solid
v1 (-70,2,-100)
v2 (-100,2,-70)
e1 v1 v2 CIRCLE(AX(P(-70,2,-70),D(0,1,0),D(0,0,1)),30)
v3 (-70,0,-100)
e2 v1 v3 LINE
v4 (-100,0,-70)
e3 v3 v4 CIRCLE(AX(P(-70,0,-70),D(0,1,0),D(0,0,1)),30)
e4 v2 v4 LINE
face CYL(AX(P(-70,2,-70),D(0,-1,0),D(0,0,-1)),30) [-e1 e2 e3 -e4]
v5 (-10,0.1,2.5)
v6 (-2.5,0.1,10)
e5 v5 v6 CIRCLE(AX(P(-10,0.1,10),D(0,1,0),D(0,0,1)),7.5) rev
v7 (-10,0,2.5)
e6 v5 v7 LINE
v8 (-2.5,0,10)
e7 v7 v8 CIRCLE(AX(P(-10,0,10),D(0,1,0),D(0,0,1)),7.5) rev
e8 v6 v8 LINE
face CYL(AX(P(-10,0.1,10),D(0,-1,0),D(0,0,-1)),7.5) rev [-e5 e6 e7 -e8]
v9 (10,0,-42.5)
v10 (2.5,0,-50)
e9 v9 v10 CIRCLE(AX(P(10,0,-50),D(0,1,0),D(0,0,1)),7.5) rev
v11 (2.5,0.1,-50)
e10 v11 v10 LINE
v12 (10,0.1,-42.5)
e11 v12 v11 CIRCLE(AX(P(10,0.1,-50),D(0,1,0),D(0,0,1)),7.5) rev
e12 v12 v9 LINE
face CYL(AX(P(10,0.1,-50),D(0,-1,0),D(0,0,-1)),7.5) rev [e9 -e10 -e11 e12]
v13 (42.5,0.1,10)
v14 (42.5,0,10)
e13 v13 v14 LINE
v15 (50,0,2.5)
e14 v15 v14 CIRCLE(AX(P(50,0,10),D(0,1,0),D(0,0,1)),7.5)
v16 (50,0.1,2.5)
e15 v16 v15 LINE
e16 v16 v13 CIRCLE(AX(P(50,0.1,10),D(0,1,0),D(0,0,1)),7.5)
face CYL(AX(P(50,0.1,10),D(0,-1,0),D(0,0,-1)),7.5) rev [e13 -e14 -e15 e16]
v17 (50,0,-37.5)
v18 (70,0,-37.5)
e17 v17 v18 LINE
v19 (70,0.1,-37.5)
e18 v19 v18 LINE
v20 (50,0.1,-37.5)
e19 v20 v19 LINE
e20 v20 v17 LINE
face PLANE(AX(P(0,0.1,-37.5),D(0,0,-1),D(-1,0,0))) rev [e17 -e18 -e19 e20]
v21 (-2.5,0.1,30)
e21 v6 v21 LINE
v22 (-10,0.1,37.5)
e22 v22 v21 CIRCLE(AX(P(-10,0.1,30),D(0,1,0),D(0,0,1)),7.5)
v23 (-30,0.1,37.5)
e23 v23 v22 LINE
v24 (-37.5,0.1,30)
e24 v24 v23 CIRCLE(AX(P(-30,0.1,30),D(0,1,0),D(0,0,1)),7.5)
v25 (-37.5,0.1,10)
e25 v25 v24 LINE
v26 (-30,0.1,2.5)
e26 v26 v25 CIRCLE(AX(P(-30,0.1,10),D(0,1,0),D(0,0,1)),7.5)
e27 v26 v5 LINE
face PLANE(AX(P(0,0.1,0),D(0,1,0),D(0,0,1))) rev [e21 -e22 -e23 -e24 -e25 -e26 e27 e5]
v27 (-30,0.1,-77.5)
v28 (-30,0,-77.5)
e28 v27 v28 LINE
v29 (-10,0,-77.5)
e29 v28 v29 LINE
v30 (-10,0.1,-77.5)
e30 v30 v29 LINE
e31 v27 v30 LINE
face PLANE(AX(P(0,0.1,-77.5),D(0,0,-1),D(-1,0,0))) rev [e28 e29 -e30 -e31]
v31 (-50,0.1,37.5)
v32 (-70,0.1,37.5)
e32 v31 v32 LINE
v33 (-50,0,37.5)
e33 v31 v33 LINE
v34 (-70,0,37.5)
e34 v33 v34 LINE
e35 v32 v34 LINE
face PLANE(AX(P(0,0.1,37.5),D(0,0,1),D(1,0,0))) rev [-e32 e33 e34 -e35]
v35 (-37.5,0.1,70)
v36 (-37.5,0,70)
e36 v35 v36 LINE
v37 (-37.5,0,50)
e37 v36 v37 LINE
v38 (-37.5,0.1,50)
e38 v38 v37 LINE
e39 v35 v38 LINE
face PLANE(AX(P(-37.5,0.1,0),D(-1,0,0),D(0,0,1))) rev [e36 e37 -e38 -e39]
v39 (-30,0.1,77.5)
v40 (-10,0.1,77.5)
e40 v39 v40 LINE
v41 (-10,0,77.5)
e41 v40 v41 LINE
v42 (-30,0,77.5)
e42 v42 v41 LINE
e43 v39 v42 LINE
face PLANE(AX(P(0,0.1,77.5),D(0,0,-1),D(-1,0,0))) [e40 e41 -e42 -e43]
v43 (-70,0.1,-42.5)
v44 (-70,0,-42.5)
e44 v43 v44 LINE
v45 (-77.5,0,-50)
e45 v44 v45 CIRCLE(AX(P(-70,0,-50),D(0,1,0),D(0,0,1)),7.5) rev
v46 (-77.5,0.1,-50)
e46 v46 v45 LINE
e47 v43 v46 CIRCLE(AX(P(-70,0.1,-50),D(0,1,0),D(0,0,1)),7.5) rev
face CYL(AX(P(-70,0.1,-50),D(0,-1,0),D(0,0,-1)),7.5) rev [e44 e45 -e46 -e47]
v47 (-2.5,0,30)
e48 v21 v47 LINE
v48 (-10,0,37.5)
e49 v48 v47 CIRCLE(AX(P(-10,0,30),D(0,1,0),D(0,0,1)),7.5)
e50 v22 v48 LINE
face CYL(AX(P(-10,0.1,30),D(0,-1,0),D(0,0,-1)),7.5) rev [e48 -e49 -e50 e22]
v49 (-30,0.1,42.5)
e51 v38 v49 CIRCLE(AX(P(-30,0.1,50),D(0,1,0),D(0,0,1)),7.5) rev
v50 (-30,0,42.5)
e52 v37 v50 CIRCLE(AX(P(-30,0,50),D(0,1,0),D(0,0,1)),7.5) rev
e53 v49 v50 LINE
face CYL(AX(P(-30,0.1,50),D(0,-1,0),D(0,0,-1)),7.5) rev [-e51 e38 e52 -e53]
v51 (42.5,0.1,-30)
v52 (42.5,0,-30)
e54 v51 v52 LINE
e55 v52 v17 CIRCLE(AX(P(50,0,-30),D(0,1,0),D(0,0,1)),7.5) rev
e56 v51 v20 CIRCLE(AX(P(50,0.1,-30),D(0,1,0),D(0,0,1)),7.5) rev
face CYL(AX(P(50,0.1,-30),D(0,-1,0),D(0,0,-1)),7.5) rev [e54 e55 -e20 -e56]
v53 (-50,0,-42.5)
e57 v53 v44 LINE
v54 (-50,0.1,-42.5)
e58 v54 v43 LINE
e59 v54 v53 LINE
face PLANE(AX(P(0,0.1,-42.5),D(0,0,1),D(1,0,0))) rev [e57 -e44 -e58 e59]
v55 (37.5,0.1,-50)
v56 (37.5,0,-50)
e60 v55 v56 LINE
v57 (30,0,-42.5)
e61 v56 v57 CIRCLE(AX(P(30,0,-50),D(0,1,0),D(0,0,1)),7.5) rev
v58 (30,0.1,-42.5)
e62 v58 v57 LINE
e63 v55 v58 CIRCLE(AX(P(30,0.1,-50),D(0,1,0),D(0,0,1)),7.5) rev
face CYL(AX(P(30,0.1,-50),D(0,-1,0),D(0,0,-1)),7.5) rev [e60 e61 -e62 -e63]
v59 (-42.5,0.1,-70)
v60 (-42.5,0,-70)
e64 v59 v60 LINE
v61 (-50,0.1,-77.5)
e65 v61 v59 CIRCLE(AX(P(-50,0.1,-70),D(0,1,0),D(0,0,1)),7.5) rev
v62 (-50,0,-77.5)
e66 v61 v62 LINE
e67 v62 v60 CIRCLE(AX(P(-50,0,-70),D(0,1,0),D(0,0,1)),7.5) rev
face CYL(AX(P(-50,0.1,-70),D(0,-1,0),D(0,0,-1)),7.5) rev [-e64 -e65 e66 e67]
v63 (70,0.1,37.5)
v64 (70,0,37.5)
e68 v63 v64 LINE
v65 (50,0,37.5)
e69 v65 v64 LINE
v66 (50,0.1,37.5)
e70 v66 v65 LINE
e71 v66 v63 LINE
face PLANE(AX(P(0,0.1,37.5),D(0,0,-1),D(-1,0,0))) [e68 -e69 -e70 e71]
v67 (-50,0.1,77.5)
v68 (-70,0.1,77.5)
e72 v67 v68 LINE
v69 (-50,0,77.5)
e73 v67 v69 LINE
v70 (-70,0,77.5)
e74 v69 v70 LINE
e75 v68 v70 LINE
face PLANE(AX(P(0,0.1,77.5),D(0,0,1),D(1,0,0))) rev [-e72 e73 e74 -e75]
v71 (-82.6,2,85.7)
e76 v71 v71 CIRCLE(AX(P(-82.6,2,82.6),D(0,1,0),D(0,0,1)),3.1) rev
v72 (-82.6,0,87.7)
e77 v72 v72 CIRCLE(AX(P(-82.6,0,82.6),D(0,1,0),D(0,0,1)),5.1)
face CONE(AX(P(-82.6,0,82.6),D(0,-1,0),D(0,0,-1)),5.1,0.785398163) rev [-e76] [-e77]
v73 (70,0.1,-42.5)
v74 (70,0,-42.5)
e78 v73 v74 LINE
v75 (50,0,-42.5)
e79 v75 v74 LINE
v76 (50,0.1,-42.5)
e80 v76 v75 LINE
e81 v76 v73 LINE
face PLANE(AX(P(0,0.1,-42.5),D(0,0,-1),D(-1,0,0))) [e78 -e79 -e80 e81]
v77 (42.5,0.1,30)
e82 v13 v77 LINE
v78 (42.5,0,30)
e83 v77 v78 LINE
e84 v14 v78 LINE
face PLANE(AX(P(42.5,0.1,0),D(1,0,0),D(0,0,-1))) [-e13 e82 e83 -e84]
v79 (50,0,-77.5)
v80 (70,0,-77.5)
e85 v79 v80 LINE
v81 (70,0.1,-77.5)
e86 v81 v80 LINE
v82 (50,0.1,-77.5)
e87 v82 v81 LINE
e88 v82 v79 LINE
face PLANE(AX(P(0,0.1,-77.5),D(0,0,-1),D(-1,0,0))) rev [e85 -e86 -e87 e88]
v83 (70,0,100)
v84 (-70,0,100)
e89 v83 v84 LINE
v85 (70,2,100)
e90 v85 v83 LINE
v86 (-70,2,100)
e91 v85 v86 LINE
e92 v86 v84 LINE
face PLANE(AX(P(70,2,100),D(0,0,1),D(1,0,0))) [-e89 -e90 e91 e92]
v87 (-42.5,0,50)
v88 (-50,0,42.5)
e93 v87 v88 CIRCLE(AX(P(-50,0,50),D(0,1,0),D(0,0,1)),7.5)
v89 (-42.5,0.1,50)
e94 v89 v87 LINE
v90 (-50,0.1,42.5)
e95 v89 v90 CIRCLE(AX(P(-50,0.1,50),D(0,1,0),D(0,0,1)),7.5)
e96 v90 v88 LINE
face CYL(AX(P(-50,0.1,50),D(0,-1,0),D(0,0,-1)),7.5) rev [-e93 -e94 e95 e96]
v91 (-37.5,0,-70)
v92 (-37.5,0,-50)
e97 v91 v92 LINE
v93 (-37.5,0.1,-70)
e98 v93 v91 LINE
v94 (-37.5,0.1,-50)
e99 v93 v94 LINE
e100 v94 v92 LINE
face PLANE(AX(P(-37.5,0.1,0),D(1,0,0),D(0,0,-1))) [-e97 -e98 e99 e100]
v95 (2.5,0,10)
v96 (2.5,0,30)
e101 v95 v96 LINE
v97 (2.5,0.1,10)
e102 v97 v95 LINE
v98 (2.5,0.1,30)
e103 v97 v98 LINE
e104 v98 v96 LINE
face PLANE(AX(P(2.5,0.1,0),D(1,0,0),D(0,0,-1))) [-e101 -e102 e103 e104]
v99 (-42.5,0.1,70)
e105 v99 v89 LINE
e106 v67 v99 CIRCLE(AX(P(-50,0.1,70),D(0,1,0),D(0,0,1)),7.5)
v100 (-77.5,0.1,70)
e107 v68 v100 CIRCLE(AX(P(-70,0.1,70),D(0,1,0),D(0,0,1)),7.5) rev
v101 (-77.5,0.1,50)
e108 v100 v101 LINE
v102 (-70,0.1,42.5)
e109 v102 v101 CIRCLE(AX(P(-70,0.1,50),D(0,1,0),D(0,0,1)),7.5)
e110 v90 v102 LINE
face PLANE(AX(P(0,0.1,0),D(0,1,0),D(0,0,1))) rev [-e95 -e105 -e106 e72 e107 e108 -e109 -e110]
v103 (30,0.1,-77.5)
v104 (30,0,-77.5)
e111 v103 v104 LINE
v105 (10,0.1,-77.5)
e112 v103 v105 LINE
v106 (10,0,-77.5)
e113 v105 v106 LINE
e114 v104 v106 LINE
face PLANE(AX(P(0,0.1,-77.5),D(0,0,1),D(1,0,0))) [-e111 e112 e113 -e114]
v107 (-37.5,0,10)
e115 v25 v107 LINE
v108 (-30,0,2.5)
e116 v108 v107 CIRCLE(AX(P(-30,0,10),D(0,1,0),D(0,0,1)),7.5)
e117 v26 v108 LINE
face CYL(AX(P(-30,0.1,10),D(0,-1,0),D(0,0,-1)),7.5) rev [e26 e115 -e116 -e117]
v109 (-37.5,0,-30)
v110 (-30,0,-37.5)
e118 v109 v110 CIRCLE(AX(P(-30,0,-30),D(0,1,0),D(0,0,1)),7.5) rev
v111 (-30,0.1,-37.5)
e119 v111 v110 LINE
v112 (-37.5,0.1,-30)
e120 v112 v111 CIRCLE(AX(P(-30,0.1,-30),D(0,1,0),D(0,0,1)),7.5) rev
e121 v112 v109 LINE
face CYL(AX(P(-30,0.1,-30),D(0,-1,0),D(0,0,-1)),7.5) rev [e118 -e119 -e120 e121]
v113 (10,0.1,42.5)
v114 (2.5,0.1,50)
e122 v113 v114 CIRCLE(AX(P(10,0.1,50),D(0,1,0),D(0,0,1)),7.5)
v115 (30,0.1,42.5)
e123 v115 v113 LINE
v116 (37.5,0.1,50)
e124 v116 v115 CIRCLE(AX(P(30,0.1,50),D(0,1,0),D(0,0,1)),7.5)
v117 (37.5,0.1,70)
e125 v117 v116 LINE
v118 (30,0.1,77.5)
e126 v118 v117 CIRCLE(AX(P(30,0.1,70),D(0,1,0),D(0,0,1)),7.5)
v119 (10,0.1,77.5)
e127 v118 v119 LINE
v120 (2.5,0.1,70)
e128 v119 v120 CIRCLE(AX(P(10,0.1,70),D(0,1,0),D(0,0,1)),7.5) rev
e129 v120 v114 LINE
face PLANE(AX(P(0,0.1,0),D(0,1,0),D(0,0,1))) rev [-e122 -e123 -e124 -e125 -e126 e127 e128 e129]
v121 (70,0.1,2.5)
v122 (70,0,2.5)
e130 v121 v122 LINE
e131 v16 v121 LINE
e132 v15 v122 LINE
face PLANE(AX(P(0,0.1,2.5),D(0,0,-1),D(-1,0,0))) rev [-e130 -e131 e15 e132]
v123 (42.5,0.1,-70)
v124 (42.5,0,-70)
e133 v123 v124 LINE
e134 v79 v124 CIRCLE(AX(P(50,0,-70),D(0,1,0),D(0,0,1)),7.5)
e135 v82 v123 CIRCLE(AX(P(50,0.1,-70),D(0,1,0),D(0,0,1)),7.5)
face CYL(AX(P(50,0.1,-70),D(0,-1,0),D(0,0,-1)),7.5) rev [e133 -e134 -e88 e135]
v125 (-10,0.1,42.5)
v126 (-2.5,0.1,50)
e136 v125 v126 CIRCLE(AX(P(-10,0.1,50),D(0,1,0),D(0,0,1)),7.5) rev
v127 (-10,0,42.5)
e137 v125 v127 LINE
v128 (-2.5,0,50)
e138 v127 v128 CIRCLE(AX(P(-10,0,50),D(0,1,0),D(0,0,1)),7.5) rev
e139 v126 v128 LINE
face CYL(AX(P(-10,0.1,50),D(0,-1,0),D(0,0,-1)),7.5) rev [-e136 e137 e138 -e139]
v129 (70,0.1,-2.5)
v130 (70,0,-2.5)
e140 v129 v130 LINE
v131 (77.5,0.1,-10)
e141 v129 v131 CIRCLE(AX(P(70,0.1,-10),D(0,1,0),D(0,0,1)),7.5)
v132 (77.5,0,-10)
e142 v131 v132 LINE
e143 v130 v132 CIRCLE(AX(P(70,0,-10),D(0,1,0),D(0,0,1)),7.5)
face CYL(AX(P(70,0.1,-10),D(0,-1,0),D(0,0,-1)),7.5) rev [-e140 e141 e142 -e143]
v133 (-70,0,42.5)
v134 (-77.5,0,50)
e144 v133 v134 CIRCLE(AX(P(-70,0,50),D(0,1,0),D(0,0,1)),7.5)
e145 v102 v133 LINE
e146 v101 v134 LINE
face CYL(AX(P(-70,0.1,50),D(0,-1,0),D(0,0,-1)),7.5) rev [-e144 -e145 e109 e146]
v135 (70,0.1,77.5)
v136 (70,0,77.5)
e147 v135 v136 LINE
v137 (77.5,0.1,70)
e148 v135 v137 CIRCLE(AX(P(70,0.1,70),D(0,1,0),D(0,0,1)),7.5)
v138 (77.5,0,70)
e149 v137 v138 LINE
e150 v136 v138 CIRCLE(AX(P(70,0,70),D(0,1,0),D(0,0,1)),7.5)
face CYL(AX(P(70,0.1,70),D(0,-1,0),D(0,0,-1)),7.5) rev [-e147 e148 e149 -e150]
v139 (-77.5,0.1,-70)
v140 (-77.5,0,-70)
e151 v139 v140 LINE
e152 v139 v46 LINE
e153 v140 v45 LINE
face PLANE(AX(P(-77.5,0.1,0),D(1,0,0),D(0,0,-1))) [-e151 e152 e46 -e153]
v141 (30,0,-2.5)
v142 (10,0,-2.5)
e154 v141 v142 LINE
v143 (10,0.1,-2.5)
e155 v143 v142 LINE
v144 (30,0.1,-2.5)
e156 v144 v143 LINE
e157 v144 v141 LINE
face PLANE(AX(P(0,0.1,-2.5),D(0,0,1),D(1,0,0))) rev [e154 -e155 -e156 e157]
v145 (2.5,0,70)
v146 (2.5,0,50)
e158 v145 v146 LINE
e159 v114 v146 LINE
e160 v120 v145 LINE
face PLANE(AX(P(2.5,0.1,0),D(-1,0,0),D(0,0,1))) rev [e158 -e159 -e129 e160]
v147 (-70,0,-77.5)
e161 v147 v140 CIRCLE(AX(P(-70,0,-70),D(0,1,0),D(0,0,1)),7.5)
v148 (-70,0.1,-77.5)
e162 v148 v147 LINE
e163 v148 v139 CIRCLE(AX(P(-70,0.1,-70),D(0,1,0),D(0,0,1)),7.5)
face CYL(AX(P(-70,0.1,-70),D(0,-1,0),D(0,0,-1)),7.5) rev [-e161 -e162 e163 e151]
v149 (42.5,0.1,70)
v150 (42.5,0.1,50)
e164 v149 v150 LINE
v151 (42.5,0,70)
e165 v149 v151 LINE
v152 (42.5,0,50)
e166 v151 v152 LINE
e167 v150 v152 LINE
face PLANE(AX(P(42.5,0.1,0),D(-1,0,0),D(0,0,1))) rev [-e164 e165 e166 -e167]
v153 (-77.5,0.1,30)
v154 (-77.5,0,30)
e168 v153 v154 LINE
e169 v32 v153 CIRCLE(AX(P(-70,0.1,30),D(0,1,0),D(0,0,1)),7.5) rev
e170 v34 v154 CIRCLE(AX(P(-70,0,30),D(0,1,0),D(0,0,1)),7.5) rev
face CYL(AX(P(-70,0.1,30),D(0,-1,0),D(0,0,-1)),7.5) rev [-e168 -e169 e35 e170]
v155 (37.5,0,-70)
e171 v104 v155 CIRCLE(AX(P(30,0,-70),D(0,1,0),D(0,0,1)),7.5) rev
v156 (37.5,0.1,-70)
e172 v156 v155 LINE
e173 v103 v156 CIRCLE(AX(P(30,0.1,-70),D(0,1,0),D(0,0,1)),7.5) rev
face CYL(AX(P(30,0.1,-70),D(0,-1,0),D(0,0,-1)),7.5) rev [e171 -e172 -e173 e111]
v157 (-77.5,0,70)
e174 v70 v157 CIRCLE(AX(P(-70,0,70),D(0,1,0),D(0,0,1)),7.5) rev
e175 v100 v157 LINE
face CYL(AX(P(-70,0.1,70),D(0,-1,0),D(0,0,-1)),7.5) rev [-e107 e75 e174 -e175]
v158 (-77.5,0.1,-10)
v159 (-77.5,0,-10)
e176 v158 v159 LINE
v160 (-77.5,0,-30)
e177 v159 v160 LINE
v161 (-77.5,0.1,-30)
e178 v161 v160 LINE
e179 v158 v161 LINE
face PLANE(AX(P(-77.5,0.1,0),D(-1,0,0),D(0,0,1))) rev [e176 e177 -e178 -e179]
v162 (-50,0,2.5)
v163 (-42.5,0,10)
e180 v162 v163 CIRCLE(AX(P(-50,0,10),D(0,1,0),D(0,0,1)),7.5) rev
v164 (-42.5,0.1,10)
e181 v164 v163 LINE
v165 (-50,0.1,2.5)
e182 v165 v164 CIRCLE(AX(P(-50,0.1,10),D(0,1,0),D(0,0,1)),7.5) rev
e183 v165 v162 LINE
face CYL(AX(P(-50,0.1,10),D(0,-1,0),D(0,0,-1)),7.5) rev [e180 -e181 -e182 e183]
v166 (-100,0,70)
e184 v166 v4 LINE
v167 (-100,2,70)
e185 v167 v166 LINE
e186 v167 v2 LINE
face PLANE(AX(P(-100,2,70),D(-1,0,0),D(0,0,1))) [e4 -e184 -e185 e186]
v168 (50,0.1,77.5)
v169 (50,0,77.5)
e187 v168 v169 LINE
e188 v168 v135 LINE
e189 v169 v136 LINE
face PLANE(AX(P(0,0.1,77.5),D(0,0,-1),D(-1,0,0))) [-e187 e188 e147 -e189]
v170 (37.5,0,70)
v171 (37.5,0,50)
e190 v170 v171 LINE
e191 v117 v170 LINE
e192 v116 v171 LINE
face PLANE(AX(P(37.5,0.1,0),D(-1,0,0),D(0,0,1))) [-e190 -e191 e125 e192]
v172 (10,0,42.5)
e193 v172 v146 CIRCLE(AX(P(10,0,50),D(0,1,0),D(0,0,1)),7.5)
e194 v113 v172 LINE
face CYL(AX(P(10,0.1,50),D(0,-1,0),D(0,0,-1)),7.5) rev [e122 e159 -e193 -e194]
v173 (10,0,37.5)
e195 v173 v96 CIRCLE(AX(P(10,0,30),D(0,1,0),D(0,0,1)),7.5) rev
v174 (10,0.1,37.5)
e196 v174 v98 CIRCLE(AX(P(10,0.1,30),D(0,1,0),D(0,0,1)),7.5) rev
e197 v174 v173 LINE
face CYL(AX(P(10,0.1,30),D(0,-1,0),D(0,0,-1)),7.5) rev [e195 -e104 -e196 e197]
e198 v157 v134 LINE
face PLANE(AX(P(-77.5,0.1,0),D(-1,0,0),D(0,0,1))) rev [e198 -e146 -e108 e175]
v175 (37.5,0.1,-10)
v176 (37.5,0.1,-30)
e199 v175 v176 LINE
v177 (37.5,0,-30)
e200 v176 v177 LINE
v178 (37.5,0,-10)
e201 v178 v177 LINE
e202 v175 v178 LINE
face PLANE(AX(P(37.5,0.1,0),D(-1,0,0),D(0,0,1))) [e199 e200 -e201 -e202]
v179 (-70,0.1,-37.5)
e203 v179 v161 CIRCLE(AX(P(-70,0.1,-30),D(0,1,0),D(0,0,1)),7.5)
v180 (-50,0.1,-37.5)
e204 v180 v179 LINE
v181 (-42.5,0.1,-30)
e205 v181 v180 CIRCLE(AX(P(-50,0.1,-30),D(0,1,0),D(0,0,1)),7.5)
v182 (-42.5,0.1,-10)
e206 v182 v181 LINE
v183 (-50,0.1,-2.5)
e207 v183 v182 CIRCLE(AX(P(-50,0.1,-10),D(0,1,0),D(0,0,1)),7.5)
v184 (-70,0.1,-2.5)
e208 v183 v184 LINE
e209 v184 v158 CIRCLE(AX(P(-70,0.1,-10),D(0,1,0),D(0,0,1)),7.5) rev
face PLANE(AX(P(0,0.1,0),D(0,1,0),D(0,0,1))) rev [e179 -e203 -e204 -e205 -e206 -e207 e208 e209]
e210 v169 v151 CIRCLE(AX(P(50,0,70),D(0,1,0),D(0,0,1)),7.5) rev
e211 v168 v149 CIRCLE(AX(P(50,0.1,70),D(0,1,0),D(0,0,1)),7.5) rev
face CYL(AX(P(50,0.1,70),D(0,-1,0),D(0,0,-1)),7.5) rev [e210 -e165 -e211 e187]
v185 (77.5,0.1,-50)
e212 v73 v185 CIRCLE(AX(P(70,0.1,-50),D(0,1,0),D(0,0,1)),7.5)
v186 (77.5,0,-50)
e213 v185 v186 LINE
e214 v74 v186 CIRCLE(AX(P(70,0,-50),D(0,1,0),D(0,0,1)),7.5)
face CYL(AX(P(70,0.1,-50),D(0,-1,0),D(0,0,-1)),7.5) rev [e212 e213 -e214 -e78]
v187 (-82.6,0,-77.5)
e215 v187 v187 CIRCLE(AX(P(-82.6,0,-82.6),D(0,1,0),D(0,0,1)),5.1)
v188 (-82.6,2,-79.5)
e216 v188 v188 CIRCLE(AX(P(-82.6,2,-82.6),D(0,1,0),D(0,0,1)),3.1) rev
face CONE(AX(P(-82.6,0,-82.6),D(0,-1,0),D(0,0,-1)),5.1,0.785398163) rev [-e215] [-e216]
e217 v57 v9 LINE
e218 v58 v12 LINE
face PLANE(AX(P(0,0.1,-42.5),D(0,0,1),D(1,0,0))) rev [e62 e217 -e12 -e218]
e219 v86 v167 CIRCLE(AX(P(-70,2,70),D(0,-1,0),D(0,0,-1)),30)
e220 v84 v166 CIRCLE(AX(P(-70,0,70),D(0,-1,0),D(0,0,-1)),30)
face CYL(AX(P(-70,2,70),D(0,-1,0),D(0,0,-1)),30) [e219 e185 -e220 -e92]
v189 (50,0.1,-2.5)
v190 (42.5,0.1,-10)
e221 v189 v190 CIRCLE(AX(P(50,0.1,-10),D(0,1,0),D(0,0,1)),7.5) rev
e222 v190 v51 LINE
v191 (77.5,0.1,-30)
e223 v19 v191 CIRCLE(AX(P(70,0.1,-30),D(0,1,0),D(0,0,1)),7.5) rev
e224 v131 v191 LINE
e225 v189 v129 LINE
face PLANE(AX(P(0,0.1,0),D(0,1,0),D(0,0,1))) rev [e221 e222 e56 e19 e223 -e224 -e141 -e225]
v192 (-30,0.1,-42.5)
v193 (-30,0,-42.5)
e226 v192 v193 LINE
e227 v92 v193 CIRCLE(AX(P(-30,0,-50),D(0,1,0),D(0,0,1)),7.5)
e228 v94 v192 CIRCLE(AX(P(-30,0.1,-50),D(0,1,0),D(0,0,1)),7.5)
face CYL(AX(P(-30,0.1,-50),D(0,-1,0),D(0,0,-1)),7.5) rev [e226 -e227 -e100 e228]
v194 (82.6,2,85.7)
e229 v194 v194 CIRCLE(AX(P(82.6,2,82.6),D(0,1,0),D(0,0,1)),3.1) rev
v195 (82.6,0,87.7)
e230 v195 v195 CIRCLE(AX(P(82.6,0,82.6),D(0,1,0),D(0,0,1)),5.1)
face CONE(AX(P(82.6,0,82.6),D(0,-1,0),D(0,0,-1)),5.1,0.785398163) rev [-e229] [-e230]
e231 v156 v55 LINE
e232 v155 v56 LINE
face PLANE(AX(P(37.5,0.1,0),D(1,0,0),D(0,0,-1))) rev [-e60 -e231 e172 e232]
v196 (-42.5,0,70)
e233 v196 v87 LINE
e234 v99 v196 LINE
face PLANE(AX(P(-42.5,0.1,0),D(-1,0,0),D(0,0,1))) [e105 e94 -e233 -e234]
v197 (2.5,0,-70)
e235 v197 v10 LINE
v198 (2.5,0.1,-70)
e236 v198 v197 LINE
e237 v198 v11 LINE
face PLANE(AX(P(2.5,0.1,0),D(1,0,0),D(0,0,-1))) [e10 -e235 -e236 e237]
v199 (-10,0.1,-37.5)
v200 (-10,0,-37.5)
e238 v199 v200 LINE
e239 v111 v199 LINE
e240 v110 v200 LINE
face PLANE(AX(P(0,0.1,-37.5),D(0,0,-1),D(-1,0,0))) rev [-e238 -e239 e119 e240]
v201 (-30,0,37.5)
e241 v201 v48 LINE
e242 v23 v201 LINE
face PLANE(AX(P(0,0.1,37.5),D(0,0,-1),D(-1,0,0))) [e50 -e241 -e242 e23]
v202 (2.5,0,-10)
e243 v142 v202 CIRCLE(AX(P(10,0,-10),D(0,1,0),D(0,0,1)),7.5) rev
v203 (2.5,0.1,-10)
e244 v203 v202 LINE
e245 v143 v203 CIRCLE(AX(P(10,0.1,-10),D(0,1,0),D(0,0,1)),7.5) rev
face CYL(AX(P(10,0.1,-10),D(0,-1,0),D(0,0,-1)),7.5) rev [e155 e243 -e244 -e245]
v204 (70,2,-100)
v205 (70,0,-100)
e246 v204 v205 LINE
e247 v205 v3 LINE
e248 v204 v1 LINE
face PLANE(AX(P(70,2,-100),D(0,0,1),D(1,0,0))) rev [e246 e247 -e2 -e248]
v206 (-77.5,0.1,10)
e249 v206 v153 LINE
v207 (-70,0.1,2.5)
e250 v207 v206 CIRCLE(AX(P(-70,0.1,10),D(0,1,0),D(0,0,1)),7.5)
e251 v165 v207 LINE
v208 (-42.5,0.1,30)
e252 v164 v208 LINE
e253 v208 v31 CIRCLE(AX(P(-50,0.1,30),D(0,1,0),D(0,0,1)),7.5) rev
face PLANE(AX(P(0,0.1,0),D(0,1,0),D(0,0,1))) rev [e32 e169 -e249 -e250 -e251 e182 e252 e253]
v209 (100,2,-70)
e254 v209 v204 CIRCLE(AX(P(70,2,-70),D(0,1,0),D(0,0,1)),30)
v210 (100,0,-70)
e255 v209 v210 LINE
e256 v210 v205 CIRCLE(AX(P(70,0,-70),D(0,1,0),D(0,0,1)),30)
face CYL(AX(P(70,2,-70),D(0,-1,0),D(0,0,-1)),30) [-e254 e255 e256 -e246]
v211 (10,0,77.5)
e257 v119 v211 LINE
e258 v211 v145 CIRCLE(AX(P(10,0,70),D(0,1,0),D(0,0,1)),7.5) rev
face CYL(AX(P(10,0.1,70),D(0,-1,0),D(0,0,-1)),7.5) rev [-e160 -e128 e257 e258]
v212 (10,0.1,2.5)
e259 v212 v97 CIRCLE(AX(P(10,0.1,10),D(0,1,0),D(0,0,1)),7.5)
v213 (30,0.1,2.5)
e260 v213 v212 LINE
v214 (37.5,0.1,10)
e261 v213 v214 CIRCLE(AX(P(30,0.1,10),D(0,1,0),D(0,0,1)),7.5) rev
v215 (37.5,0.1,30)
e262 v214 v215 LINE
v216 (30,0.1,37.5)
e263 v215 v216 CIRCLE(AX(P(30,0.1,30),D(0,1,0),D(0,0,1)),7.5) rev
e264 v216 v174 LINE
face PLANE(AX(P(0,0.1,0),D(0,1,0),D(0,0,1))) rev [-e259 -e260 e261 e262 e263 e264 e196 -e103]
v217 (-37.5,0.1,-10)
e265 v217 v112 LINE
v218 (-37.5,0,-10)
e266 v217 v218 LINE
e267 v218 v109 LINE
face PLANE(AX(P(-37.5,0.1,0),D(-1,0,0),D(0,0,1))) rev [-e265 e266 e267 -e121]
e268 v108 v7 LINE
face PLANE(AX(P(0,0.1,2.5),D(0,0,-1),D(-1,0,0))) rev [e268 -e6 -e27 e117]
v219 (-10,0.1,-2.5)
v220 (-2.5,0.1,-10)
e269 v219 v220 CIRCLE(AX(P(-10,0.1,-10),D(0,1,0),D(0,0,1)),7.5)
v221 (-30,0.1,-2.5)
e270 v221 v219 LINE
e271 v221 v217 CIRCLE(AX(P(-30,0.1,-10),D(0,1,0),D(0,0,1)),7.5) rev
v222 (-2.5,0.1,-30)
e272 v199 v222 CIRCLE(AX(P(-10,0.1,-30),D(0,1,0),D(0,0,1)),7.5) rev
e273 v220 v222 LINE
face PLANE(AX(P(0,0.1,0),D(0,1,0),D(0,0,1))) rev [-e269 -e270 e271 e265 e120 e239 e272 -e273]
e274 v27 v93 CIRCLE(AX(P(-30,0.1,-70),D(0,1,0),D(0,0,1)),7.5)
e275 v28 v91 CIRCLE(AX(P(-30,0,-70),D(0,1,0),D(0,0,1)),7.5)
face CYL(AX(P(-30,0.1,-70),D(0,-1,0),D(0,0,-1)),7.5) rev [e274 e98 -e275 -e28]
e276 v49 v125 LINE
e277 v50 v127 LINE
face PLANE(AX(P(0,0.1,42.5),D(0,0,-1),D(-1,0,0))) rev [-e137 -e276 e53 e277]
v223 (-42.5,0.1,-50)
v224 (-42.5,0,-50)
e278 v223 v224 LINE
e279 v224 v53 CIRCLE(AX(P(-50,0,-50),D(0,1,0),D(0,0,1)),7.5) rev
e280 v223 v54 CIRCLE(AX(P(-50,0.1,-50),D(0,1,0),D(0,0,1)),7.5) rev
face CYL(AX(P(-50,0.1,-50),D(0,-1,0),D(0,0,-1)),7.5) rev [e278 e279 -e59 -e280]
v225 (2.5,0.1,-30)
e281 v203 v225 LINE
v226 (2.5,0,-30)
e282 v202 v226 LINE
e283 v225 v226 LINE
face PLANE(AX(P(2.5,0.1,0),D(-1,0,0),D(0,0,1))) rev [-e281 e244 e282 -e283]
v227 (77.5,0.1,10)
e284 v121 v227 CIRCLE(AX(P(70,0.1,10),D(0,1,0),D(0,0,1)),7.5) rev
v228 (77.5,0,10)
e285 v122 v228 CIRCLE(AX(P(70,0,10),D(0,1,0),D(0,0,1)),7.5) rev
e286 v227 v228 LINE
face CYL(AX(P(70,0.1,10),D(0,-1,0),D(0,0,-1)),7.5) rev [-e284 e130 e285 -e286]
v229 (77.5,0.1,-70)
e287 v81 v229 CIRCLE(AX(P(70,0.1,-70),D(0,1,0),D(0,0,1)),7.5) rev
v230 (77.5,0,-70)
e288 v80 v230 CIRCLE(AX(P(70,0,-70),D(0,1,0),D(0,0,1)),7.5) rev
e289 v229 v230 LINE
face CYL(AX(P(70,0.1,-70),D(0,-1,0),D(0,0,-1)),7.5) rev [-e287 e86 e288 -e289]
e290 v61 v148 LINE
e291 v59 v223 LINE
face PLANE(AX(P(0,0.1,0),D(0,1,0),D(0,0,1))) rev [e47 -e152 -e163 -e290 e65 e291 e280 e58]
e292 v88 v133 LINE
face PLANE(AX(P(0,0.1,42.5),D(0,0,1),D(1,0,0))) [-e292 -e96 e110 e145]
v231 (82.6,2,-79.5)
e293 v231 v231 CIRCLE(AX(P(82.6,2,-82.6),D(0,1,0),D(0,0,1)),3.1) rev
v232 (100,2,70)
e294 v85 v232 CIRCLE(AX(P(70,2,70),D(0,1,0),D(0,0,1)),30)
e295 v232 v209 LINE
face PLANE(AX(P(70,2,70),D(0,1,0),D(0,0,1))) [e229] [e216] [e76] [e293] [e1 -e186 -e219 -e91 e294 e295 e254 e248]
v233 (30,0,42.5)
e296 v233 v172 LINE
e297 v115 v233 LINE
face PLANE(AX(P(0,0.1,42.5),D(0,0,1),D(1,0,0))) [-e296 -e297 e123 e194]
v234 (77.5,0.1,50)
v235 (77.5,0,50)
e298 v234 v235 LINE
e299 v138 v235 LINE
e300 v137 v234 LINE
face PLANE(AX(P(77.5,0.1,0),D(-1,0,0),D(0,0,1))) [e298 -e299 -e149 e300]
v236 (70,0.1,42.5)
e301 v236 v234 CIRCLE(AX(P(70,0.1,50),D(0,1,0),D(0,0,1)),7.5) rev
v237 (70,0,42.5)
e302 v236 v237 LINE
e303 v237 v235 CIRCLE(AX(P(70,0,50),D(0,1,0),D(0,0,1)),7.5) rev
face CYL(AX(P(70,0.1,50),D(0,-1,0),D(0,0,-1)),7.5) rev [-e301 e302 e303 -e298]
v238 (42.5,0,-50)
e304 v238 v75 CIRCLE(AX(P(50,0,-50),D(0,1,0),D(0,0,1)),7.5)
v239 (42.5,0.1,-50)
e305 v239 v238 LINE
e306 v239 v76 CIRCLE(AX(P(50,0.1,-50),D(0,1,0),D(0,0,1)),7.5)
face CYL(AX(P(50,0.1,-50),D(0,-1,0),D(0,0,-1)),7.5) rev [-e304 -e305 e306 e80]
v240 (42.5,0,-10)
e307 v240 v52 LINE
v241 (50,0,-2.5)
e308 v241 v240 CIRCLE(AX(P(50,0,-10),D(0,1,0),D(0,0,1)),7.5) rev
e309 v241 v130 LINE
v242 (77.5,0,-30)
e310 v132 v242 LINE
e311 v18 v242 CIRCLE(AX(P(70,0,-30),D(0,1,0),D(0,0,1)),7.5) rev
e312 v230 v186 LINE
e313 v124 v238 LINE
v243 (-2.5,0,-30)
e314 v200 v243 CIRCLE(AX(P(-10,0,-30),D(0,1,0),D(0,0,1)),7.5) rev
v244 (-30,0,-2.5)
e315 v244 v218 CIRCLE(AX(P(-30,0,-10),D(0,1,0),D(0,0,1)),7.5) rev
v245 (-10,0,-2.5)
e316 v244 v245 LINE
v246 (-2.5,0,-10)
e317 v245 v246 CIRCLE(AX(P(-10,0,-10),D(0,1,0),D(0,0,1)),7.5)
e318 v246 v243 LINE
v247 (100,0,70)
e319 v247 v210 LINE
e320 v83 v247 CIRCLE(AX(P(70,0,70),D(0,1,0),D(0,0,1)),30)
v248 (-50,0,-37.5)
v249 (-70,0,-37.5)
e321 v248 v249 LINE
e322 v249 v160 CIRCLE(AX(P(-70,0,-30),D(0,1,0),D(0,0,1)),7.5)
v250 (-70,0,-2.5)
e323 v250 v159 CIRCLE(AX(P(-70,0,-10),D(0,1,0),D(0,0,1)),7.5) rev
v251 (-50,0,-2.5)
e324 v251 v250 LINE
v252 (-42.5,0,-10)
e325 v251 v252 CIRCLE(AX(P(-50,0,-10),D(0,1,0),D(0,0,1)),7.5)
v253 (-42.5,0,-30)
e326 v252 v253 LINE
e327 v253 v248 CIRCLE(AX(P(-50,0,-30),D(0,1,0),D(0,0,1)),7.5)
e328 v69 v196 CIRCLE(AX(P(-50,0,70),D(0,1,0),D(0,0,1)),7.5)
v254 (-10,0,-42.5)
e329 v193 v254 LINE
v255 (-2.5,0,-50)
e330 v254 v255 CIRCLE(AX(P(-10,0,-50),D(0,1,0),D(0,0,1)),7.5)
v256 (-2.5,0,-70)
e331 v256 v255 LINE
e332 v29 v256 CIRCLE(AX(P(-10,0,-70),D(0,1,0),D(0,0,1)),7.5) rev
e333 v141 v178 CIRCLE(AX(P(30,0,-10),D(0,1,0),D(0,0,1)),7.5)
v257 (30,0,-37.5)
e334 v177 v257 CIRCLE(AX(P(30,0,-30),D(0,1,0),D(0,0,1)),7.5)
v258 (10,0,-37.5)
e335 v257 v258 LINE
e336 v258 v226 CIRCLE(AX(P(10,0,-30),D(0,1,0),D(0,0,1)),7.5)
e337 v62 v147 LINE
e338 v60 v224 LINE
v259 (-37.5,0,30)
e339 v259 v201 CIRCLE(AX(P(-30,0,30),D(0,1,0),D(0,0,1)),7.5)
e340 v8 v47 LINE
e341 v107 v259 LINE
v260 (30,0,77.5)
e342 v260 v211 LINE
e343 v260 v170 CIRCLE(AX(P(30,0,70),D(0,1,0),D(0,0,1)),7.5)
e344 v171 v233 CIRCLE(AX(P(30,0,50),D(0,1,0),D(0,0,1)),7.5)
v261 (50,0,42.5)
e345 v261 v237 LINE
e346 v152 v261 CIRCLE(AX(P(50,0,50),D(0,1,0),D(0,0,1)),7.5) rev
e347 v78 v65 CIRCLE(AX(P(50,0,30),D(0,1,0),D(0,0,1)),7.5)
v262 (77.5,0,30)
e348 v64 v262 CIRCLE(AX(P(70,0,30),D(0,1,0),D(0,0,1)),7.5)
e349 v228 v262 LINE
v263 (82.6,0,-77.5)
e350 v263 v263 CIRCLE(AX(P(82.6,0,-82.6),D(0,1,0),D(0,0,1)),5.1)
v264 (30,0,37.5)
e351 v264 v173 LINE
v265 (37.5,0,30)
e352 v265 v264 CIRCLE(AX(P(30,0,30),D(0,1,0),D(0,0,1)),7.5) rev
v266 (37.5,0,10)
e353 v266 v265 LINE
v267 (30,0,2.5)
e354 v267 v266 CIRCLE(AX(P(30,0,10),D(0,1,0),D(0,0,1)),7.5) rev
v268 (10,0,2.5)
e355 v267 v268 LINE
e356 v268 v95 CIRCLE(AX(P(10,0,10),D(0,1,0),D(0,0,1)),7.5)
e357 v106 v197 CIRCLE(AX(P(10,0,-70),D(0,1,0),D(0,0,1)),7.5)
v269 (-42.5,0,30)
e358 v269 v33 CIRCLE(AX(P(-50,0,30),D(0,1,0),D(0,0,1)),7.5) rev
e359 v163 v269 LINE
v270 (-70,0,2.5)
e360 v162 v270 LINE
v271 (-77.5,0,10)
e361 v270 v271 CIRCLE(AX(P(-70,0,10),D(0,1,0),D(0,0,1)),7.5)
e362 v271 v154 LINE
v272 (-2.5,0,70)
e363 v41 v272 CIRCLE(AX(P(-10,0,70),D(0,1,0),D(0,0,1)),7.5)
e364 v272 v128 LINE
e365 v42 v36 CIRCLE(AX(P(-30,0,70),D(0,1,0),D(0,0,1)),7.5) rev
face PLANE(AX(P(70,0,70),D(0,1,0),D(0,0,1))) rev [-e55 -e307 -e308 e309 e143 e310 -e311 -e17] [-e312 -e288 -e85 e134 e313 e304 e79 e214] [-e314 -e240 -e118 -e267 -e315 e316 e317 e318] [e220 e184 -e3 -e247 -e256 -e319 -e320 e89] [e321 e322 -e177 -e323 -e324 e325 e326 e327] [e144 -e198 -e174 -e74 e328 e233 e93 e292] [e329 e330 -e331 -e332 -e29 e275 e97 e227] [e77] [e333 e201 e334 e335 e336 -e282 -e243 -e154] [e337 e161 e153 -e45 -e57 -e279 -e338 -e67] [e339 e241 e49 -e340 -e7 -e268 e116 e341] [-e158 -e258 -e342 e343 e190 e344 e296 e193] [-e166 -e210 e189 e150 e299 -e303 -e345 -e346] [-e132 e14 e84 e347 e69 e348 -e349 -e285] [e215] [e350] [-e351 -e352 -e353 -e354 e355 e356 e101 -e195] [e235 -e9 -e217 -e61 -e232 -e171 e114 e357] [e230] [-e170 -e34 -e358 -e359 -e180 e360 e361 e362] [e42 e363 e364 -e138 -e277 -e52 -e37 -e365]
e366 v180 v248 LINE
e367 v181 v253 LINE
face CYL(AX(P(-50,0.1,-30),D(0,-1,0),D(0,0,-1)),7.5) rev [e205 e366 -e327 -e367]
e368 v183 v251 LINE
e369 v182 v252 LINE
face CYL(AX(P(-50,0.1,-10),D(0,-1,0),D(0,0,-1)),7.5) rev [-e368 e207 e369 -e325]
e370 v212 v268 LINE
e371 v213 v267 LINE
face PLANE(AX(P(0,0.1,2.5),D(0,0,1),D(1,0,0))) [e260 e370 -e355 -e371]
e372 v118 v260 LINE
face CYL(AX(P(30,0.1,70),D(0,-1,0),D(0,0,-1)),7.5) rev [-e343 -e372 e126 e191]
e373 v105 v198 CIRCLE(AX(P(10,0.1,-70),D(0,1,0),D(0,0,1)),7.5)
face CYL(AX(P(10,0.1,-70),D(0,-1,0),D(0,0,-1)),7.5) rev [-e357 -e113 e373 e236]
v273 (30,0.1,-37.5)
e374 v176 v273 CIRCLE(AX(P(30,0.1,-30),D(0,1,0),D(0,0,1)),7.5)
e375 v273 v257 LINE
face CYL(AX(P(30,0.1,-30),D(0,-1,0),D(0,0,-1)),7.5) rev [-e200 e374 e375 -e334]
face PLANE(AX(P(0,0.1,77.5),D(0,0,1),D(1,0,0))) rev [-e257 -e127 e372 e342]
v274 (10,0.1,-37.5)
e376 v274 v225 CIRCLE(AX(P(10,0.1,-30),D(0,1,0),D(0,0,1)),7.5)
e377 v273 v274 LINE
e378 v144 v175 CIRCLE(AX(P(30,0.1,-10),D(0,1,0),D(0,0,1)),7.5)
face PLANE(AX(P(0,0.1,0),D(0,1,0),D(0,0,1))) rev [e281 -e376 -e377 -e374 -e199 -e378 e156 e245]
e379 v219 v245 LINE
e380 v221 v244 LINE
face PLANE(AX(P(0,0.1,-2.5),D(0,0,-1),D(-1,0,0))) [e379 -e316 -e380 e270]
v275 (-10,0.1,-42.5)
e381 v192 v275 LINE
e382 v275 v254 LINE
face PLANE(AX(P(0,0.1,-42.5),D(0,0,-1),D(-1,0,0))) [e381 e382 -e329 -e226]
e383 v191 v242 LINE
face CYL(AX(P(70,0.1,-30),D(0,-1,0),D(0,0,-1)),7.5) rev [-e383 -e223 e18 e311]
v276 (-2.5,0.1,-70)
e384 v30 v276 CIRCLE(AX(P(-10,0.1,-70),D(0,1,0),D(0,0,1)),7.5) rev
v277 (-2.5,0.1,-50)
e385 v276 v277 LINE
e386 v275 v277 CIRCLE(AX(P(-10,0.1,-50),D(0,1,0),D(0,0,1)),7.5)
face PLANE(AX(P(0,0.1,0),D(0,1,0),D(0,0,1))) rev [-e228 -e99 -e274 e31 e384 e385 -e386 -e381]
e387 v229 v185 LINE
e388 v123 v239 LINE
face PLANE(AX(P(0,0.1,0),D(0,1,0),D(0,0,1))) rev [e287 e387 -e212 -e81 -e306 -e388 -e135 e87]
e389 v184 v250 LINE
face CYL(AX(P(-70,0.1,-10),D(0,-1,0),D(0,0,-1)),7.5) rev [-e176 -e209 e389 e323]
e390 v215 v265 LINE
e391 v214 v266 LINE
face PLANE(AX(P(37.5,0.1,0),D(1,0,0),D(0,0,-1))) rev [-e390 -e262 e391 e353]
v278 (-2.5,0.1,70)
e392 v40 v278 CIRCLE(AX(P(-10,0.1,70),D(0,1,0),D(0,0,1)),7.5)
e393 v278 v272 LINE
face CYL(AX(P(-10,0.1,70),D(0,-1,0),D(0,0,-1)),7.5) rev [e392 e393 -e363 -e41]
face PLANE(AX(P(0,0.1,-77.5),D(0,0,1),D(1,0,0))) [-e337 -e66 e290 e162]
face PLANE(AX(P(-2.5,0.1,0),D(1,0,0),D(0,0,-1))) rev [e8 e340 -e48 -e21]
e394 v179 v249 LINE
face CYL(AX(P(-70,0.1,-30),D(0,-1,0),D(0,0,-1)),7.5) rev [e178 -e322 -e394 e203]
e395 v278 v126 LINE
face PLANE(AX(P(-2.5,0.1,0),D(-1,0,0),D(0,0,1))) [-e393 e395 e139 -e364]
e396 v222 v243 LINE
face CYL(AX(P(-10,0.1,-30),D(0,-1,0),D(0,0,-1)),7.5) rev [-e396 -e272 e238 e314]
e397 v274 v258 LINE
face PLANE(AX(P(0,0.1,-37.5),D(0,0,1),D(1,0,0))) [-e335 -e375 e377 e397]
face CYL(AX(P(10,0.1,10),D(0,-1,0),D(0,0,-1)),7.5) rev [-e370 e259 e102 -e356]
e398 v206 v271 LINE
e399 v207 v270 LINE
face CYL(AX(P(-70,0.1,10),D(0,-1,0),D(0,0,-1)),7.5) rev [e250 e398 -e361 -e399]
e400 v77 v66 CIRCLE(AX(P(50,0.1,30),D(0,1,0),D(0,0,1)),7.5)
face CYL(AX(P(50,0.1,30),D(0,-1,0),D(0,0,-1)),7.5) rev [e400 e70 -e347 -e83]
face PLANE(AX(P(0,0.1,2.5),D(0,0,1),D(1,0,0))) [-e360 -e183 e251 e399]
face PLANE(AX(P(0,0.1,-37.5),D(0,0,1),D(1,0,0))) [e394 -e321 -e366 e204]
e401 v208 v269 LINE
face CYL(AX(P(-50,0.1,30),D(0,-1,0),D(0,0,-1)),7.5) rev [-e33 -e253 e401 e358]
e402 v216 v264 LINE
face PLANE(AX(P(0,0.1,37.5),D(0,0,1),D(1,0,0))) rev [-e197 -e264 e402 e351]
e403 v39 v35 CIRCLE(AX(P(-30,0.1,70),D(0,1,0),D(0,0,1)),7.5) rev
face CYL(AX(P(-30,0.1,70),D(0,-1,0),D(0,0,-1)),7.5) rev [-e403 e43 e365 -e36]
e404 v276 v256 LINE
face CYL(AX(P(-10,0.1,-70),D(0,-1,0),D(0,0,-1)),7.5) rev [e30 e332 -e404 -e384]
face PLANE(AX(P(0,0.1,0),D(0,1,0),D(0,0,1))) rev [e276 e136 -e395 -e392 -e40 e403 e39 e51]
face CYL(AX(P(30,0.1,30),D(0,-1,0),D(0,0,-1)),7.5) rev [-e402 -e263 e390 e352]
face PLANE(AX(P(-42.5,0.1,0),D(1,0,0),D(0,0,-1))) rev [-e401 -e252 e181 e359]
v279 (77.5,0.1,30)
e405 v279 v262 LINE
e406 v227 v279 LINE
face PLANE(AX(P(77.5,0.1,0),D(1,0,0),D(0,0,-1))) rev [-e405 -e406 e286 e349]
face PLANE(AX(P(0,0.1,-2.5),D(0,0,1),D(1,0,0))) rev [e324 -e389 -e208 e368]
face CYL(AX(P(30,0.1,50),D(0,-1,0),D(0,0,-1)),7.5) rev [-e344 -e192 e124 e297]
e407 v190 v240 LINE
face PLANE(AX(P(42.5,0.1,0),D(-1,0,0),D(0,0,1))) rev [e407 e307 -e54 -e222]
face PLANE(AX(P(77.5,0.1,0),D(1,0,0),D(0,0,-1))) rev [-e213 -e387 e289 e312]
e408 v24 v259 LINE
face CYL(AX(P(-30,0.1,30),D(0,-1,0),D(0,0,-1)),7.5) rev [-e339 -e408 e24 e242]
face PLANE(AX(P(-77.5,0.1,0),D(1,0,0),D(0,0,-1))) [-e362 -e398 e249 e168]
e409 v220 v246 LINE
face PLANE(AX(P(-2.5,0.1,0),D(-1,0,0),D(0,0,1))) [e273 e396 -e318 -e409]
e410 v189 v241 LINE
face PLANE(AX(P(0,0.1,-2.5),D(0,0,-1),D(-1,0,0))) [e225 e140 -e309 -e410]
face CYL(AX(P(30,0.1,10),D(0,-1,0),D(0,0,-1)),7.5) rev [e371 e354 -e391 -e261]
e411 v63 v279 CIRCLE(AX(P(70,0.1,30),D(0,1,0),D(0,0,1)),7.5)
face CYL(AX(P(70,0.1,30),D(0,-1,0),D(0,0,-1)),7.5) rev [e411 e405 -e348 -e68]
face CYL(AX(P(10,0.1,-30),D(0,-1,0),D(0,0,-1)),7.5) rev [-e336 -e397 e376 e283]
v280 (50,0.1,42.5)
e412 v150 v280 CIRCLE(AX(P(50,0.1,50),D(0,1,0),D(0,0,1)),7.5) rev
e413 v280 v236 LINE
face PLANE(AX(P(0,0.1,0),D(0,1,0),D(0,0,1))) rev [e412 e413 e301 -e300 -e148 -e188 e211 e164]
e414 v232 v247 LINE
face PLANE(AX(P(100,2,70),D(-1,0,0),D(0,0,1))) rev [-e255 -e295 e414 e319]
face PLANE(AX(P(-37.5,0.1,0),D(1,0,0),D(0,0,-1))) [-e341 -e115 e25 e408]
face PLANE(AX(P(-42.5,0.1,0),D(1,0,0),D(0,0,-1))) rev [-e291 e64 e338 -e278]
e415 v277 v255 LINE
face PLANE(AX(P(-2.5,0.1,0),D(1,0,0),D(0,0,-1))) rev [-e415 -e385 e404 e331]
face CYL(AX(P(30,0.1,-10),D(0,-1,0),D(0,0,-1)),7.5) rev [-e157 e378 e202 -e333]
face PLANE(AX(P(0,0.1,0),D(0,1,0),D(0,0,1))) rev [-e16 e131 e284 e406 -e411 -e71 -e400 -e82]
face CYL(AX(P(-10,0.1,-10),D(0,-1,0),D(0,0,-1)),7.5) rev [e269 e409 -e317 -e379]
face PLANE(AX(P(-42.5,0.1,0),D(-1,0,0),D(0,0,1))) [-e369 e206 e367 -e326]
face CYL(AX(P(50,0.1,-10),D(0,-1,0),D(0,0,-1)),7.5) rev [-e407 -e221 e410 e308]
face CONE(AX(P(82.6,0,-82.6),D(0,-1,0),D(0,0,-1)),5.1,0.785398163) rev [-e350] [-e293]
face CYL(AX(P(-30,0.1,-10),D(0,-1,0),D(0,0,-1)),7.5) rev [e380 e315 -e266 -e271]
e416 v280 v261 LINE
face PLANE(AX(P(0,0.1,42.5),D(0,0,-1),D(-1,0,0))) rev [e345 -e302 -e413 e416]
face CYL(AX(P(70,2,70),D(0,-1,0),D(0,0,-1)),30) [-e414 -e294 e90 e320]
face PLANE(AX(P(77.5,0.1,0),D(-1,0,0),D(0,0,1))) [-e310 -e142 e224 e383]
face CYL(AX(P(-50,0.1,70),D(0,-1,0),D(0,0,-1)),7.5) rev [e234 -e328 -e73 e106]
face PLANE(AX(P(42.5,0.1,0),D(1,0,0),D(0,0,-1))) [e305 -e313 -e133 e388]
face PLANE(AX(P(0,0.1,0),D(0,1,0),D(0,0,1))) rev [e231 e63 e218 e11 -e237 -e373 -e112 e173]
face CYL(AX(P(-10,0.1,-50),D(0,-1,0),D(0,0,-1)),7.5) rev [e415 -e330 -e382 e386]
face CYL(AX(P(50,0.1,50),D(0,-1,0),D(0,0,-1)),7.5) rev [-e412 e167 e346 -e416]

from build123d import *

# Parameters (mm, degrees)
SKETCH1_R           = 2.6
BOSS_EXTRUDE1_DEPTH = 2
CUT_EXTRUDE1_DEPTH  = 0.1
CHAMFER1_SIZE       = 2.5


with BuildPart() as part:
    # Sketch1 → Boss-Extrude1 (new body)
    with BuildSketch(Plane(origin=(0, 0, 0), x_dir=(1, 0, 0), z_dir=(0, 1, 0))):
        with BuildLine():
            Line((70, -100), (-70, -100))
            ThreePointArc((-70, -100), (-91.213203436, -91.213203436), (-100, -70))
            Line((-100, -70), (-100, 70))
            ThreePointArc((-100, 70), (-91.213203436, 91.213203436), (-70, 100))
            Line((-70, 100), (70, 100))
            ThreePointArc((70, 100), (91.213203436, 91.213203436), (100, 70))
            Line((100, 70), (100, -70))
            ThreePointArc((100, -70), (91.213203436, -91.213203436), (70, -100))
        make_face()
        with Locations(Location((-82.6, 82.6, 0), (0, 0, 270))):
            Circle(SKETCH1_R, mode=Mode.SUBTRACT)
        with Locations(Location((82.6, 82.6, 0), (0, 0, 270))):
            Circle(SKETCH1_R, mode=Mode.SUBTRACT)
        with Locations(Location((82.6, -82.6, 0), (0, 0, 270))):
            Circle(SKETCH1_R, mode=Mode.SUBTRACT)
        with Locations(Location((-82.6, -82.6, 0), (0, 0, 270))):
            Circle(SKETCH1_R, mode=Mode.SUBTRACT)
    extrude(amount=BOSS_EXTRUDE1_DEPTH)

    # Sketch1<3> → Cut-Extrude1 (cut)
    with BuildSketch(Plane(origin=(0, 0, 0), x_dir=(1, 0, 0), z_dir=(0, 1, 0))):
        with BuildLine():
            Line((-42.5, 50), (-42.5, 70))
            ThreePointArc((-42.5, 70), (-44.696699141, 75.303300859), (-50, 77.5))
            Line((-50, 77.5), (-70, 77.5))
            ThreePointArc((-70, 77.5), (-75.303300859, 75.303300859), (-77.5, 70))
            Line((-77.5, 70), (-77.5, 50))
            ThreePointArc((-77.5, 50), (-75.303300859, 44.696699141), (-70, 42.5))
            Line((-70, 42.5), (-50, 42.5))
            ThreePointArc((-50, 42.5), (-44.696699141, 44.696699141), (-42.5, 50))
        make_face()
        with BuildLine():
            Line((-70, 2.5), (-50, 2.5))
            ThreePointArc((-50, 2.5), (-44.696699141, 4.696699141), (-42.5, 10))
            Line((-42.5, 10), (-42.5, 30))
            ThreePointArc((-42.5, 30), (-44.696699141, 35.303300859), (-50, 37.5))
            Line((-50, 37.5), (-70, 37.5))
            ThreePointArc((-70, 37.5), (-75.303300859, 35.303300859), (-77.5, 30))
            Line((-77.5, 30), (-77.5, 10))
            ThreePointArc((-77.5, 10), (-75.303300859, 4.696699141), (-70, 2.5))
        make_face()
        with BuildLine():
            Line((-10, 77.5), (-30, 77.5))
            ThreePointArc((-30, 77.5), (-35.303300859, 75.303300859), (-37.5, 70))
            Line((-37.5, 70), (-37.5, 50))
            ThreePointArc((-37.5, 50), (-35.303300859, 44.696699141), (-30, 42.5))
            Line((-30, 42.5), (-10, 42.5))
            ThreePointArc((-10, 42.5), (-4.696699141, 44.696699141), (-2.5, 50))
            Line((-2.5, 50), (-2.5, 70))
            ThreePointArc((-2.5, 70), (-4.696699141, 75.303300859), (-10, 77.5))
        make_face()
        with BuildLine():
            Line((-10, 37.5), (-30, 37.5))
            ThreePointArc((-30, 37.5), (-35.303300859, 35.303300859), (-37.5, 30))
            Line((-37.5, 30), (-37.5, 10))
            ThreePointArc((-37.5, 10), (-35.303300859, 4.696699141), (-30, 2.5))
            Line((-30, 2.5), (-10, 2.5))
            ThreePointArc((-10, 2.5), (-4.696699141, 4.696699141), (-2.5, 10))
            Line((-2.5, 10), (-2.5, 30))
            ThreePointArc((-2.5, 30), (-4.696699141, 35.303300859), (-10, 37.5))
        make_face()
        with BuildLine():
            Line((42.5, 30), (42.5, 10))
            ThreePointArc((42.5, 10), (44.696699141, 4.696699141), (50, 2.5))
            Line((50, 2.5), (70, 2.5))
            ThreePointArc((70, 2.5), (75.303300859, 4.696699141), (77.5, 10))
            Line((77.5, 10), (77.5, 30))
            ThreePointArc((77.5, 30), (75.303300859, 35.303300859), (70, 37.5))
            Line((70, 37.5), (50, 37.5))
            ThreePointArc((50, 37.5), (44.696699141, 35.303300859), (42.5, 30))
        make_face()
        with BuildLine():
            ThreePointArc((50, 77.5), (44.696699141, 75.303300859), (42.5, 70))
            Line((42.5, 70), (42.5, 50))
            ThreePointArc((42.5, 50), (44.696699141, 44.696699141), (50, 42.5))
            Line((50, 42.5), (70, 42.5))
            ThreePointArc((70, 42.5), (75.303300859, 44.696699141), (77.5, 50))
            Line((77.5, 50), (77.5, 70))
            ThreePointArc((77.5, 70), (75.303300859, 75.303300859), (70, 77.5))
            Line((70, 77.5), (50, 77.5))
        make_face()
        with BuildLine():
            ThreePointArc((10, 77.5), (4.696699141, 75.303300859), (2.5, 70))
            Line((2.5, 70), (2.5, 50))
            ThreePointArc((2.5, 50), (4.696699141, 44.696699141), (10, 42.5))
            Line((10, 42.5), (30, 42.5))
            ThreePointArc((30, 42.5), (35.303300859, 44.696699141), (37.5, 50))
            Line((37.5, 50), (37.5, 70))
            ThreePointArc((37.5, 70), (35.303300859, 75.303300859), (30, 77.5))
            Line((30, 77.5), (10, 77.5))
        make_face()
        with BuildLine():
            ThreePointArc((30, 2.5), (35.303300859, 4.696699141), (37.5, 10))
            Line((37.5, 10), (37.5, 30))
            ThreePointArc((37.5, 30), (35.303300859, 35.303300859), (30, 37.5))
            Line((30, 37.5), (10, 37.5))
            ThreePointArc((10, 37.5), (4.696699141, 35.303300859), (2.5, 30))
            Line((2.5, 30), (2.5, 10))
            ThreePointArc((2.5, 10), (4.696699141, 4.696699141), (10, 2.5))
            Line((10, 2.5), (30, 2.5))
        make_face()
        with BuildLine():
            ThreePointArc((-50, -77.5), (-44.696699141, -75.303300859), (-42.5, -70))
            Line((-42.5, -70), (-42.5, -50))
            ThreePointArc((-42.5, -50), (-44.696699141, -44.696699141), (-50, -42.5))
            Line((-50, -42.5), (-70, -42.5))
            ThreePointArc((-70, -42.5), (-75.303300859, -44.696699141), (-77.5, -50))
            Line((-77.5, -50), (-77.5, -70))
            ThreePointArc((-77.5, -70), (-75.303300859, -75.303300859), (-70, -77.5))
            Line((-70, -77.5), (-50, -77.5))
        make_face()
        with BuildLine():
            ThreePointArc((-10, -77.5), (-4.696699141, -75.303300859), (-2.5, -70))
            Line((-2.5, -70), (-2.5, -50))
            ThreePointArc((-2.5, -50), (-4.696699141, -44.696699141), (-10, -42.5))
            Line((-10, -42.5), (-30, -42.5))
            ThreePointArc((-30, -42.5), (-35.303300859, -44.696699141), (-37.5, -50))
            Line((-37.5, -50), (-37.5, -70))
            ThreePointArc((-37.5, -70), (-35.303300859, -75.303300859), (-30, -77.5))
            Line((-30, -77.5), (-10, -77.5))
        make_face()
        with BuildLine():
            ThreePointArc((30, -77.5), (35.303300859, -75.303300859), (37.5, -70))
            Line((37.5, -70), (37.5, -50))
            ThreePointArc((37.5, -50), (35.303300859, -44.696699141), (30, -42.5))
            Line((30, -42.5), (10, -42.5))
            ThreePointArc((10, -42.5), (4.696699141, -44.696699141), (2.5, -50))
            Line((2.5, -50), (2.5, -70))
            ThreePointArc((2.5, -70), (4.696699141, -75.303300859), (10, -77.5))
            Line((10, -77.5), (30, -77.5))
        make_face()
        with BuildLine():
            ThreePointArc((70, -77.5), (75.303300859, -75.303300859), (77.5, -70))
            Line((77.5, -70), (77.5, -50))
            ThreePointArc((77.5, -50), (75.303300859, -44.696699141), (70, -42.5))
            Line((70, -42.5), (50, -42.5))
            ThreePointArc((50, -42.5), (44.696699141, -44.696699141), (42.5, -50))
            Line((42.5, -50), (42.5, -70))
            ThreePointArc((42.5, -70), (44.696699141, -75.303300859), (50, -77.5))
            Line((50, -77.5), (70, -77.5))
        make_face()
        with BuildLine():
            ThreePointArc((42.5, -30), (44.696699141, -35.303300859), (50, -37.5))
            Line((50, -37.5), (70, -37.5))
            ThreePointArc((70, -37.5), (75.303300859, -35.303300859), (77.5, -30))
            Line((77.5, -30), (77.5, -10))
            ThreePointArc((77.5, -10), (75.303300859, -4.696699141), (70, -2.5))
            Line((70, -2.5), (50, -2.5))
            ThreePointArc((50, -2.5), (44.696699141, -4.696699141), (42.5, -10))
            Line((42.5, -10), (42.5, -30))
        make_face()
        with BuildLine():
            Line((37.5, -30), (37.5, -10))
            ThreePointArc((37.5, -10), (35.303300859, -4.696699141), (30, -2.5))
            Line((30, -2.5), (10, -2.5))
            ThreePointArc((10, -2.5), (4.696699141, -4.696699141), (2.5, -10))
            Line((2.5, -10), (2.5, -30))
            ThreePointArc((2.5, -30), (4.696699141, -35.303300859), (10, -37.5))
            Line((10, -37.5), (30, -37.5))
            ThreePointArc((30, -37.5), (35.303300859, -35.303300859), (37.5, -30))
        make_face()
        with BuildLine():
            ThreePointArc((-37.5, -30), (-35.303300859, -35.303300859), (-30, -37.5))
            Line((-30, -37.5), (-10, -37.5))
            ThreePointArc((-10, -37.5), (-4.696699141, -35.303300859), (-2.5, -30))
            Line((-2.5, -30), (-2.5, -10))
            ThreePointArc((-2.5, -10), (-4.696699141, -4.696699141), (-10, -2.5))
            Line((-10, -2.5), (-30, -2.5))
            ThreePointArc((-30, -2.5), (-35.303300859, -4.696699141), (-37.5, -10))
            Line((-37.5, -10), (-37.5, -30))
        make_face()
        with BuildLine():
            Line((-42.5, -30), (-42.5, -10))
            ThreePointArc((-42.5, -10), (-44.696699141, -4.696699141), (-50, -2.5))
            Line((-50, -2.5), (-70, -2.5))
            ThreePointArc((-70, -2.5), (-75.303300859, -4.696699141), (-77.5, -10))
            Line((-77.5, -10), (-77.5, -30))
            ThreePointArc((-77.5, -30), (-75.303300859, -35.303300859), (-70, -37.5))
            Line((-70, -37.5), (-50, -37.5))
            ThreePointArc((-50, -37.5), (-44.696699141, -35.303300859), (-42.5, -30))
        make_face()
    extrude(amount=CUT_EXTRUDE1_DEPTH, mode=Mode.SUBTRACT)

    # Chamfer1
    # the kernel refuses this chamfer: 2.5 mm, written as the material it takes off along each edge
    with BuildSketch(Plane(origin=(82.6, 0, 82.6), x_dir=(0, 0, 1), z_dir=(-1, 0, 0))) as chamfer1_piece_1:
        Polygon((2.6 + CHAMFER1_SIZE, 0), (2.6, CHAMFER1_SIZE), (2.6, 0), align=None)
    revolve(axis=Axis((82.6, 0, 82.6), (0, 1, 0)), mode=Mode.SUBTRACT)
    with BuildSketch(Plane(origin=(-82.6, 0, 82.6), x_dir=(0, 0, 1), z_dir=(-1, 0, 0))) as chamfer1_piece_2:
        Polygon((2.6 + CHAMFER1_SIZE, 0), (2.6, CHAMFER1_SIZE), (2.6, 0), align=None)
    revolve(axis=Axis((-82.6, 0, 82.6), (0, 1, 0)), mode=Mode.SUBTRACT)
    with BuildSketch(Plane(origin=(-82.6, 0, -82.6), x_dir=(0, 0, 1), z_dir=(-1, 0, 0))) as chamfer1_piece_3:
        Polygon((2.6 + CHAMFER1_SIZE, 0), (2.6, CHAMFER1_SIZE), (2.6, 0), align=None)
    revolve(axis=Axis((-82.6, 0, -82.6), (0, 1, 0)), mode=Mode.SUBTRACT)
    with BuildSketch(Plane(origin=(82.6, 0, -82.6), x_dir=(0, 0, 1), z_dir=(-1, 0, 0))) as chamfer1_piece_4:
        Polygon((2.6 + CHAMFER1_SIZE, 0), (2.6, CHAMFER1_SIZE), (2.6, 0), align=None)
    revolve(axis=Axis((82.6, 0, -82.6), (0, 1, 0)), mode=Mode.SUBTRACT)


solid = part.part
